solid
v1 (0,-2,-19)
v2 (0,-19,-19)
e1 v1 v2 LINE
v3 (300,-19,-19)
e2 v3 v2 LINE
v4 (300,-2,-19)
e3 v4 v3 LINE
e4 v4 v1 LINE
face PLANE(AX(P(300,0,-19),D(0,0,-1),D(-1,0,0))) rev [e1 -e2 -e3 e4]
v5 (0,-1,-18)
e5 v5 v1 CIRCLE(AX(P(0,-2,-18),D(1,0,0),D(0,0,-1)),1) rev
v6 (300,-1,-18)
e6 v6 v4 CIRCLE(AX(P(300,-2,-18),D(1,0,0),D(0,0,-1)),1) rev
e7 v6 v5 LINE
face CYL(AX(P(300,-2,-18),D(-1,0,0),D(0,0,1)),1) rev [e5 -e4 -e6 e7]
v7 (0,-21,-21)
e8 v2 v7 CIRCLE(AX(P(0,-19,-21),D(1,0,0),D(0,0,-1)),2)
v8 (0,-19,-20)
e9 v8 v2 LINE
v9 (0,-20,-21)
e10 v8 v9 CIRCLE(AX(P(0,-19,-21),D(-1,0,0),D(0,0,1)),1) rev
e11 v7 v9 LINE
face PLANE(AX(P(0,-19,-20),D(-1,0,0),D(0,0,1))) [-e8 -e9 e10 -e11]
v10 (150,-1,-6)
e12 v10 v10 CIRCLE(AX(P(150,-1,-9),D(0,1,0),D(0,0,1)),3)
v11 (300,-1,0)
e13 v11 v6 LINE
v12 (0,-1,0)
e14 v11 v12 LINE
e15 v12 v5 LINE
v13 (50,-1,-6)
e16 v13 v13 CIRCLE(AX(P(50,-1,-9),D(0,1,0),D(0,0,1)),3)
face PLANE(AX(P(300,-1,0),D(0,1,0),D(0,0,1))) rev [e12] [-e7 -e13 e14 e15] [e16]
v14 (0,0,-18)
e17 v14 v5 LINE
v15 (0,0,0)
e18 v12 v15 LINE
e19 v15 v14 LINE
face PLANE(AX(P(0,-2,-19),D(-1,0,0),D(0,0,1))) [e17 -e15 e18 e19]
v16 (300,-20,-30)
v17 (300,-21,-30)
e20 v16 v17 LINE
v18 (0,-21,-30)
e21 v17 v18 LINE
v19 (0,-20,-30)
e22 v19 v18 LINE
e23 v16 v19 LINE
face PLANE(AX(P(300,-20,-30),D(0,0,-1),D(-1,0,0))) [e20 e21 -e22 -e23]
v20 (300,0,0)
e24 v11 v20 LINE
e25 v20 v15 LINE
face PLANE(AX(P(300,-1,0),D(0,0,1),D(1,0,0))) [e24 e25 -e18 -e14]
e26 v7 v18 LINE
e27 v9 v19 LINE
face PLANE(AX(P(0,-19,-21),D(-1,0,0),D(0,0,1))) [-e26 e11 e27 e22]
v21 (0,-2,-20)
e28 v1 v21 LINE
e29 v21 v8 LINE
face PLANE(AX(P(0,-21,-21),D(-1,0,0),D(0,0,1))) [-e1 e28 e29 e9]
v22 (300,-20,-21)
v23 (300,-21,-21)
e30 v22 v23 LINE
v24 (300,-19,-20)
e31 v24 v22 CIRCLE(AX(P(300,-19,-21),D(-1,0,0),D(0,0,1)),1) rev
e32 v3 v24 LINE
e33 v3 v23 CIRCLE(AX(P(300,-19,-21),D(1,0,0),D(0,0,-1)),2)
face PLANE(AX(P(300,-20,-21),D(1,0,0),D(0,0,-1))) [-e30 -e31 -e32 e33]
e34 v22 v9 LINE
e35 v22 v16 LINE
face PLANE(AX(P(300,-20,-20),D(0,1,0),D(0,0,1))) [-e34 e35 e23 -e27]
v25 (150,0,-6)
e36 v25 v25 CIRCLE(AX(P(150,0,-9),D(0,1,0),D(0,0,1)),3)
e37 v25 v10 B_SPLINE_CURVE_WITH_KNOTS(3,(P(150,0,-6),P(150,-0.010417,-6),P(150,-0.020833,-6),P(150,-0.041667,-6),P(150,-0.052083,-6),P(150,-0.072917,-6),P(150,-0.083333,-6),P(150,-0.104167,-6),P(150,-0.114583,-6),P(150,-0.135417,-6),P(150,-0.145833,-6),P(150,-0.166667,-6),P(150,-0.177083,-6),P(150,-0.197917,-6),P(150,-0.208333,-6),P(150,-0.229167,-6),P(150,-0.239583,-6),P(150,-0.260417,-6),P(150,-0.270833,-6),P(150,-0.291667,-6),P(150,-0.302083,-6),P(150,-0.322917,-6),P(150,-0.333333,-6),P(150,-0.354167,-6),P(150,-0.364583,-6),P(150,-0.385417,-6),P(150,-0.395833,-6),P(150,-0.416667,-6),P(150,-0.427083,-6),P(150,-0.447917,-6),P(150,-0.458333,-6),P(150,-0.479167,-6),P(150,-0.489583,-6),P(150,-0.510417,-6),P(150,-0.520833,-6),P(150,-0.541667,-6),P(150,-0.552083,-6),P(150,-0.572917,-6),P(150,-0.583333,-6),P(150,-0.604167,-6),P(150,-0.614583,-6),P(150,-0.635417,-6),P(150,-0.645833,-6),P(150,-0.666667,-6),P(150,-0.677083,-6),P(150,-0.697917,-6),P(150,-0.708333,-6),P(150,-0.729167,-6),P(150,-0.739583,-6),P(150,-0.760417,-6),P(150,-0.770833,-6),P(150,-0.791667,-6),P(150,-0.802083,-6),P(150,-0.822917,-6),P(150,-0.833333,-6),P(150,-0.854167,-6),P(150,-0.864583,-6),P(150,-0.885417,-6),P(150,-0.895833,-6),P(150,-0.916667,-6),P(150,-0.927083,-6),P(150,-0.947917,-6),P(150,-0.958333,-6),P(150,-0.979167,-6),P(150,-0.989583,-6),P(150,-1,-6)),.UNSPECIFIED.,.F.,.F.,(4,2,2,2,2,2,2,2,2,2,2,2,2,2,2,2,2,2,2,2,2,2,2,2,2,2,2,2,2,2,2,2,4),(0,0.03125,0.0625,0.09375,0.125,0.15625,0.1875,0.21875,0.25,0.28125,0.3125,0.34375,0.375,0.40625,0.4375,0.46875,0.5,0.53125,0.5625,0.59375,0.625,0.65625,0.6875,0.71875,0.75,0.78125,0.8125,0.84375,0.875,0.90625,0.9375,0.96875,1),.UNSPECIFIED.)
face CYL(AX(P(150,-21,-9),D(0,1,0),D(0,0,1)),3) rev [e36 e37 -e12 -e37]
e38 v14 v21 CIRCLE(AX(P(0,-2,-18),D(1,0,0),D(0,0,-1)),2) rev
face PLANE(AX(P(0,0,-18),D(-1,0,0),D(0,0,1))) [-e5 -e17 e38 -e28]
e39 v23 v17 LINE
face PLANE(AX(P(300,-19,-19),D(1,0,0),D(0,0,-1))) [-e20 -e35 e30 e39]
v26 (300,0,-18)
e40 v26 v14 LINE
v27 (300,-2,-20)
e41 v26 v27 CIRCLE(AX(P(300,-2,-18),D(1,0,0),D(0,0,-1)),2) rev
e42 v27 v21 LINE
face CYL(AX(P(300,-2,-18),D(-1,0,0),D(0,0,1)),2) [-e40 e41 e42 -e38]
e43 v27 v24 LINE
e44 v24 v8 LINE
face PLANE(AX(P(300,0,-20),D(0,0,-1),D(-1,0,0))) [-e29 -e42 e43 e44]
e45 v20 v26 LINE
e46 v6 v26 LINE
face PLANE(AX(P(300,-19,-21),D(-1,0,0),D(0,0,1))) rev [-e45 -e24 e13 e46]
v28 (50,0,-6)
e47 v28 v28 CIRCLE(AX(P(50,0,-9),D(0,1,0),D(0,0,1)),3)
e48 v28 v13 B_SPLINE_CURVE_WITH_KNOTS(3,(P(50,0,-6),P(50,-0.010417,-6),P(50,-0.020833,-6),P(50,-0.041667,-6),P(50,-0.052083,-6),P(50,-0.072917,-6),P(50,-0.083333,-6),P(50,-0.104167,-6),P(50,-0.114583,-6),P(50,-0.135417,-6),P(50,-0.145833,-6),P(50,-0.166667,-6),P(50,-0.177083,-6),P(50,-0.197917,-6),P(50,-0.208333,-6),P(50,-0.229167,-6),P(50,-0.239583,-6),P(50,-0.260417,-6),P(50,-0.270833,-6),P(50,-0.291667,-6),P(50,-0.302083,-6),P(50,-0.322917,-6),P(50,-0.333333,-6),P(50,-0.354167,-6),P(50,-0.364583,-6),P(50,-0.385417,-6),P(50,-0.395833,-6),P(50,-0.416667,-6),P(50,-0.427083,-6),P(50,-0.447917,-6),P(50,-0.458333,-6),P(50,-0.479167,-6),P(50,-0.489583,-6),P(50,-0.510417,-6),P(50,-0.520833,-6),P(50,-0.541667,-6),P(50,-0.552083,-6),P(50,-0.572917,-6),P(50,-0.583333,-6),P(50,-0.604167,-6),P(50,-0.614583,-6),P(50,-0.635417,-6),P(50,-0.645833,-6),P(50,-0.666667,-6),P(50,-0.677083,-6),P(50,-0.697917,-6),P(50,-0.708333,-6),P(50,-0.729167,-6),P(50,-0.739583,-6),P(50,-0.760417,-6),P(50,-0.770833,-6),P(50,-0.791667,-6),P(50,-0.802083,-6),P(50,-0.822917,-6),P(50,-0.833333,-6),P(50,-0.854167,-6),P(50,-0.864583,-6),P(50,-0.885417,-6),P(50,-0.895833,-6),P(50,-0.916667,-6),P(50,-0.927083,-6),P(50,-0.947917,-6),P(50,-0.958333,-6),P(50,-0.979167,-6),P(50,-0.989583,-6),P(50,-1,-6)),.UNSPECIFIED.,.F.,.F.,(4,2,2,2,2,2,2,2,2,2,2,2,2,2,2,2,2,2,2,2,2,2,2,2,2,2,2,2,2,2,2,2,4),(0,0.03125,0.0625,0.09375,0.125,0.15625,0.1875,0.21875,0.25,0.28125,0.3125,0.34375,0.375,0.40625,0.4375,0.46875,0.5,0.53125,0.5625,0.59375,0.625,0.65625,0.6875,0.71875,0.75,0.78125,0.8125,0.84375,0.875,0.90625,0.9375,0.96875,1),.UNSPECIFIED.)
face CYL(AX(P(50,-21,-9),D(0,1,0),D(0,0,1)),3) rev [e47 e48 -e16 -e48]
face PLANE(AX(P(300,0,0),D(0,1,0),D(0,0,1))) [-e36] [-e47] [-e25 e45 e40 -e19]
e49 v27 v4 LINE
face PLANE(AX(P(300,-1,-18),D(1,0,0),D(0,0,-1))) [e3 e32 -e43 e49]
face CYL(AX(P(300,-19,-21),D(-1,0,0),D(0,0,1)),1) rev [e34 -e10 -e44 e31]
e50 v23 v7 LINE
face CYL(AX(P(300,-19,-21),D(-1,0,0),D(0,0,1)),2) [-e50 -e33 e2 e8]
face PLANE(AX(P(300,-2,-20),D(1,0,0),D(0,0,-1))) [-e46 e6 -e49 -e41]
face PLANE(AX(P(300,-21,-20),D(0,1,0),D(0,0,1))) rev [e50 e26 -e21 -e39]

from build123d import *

# Parameters (mm, degrees)
BASE_FLANGE1_DEPTH      = 300
CUT_EXTRUDE1_DEPTH      = 303.226736077
CUT_EXTRUDE1_DEPTH_BACK = 303.226736077
SKETCH7_R               = 3


# Sheet-metal steps are written as plain solids
with BuildPart() as part:
    # Sketch2 → Base-Flange1 (new body)
    with BuildSketch(Plane(origin=(0, 0, 0), x_dir=(0, 0, -1), z_dir=(1, 0, 0))):
        with BuildLine():
            Line((0, 0), (18, 0))
            ThreePointArc((18, 0), (19.414213562, -0.585786438), (20, -2))
            Line((20, -2), (20, -19))
            ThreePointArc((20, -19), (20.292893219, -19.707106781), (21, -20))
            Line((21, -20), (30, -20))
            Line((30, -20), (30, -21))
            Line((30, -21), (21, -21))
            ThreePointArc((21, -21), (19.585786438, -20.414213562), (19, -19))
            Line((19, -19), (19, -2))
            ThreePointArc((19, -2), (18.707106781, -1.292893219), (18, -1))
            Line((18, -1), (0, -1))
            Line((0, -1), (0, 0))
        make_face()
    extrude(amount=BASE_FLANGE1_DEPTH)

    # Sketch7 → Cut-Extrude1 (cut, two sides: drawn at the far end of the back side and taken through both)
    with BuildSketch(Plane(origin=(0, 0, 0), x_dir=(1, 0, 0), z_dir=(0, 1, 0)).offset(-CUT_EXTRUDE1_DEPTH_BACK)):
        with Locations(Location((50, 9, 0), (0, 0, 270))):
            Circle(SKETCH7_R)
        with Locations(Location((150, 9, 0), (0, 0, 270))):
            Circle(SKETCH7_R)
    extrude(amount=CUT_EXTRUDE1_DEPTH + CUT_EXTRUDE1_DEPTH_BACK, mode=Mode.SUBTRACT)


solid = part.part
